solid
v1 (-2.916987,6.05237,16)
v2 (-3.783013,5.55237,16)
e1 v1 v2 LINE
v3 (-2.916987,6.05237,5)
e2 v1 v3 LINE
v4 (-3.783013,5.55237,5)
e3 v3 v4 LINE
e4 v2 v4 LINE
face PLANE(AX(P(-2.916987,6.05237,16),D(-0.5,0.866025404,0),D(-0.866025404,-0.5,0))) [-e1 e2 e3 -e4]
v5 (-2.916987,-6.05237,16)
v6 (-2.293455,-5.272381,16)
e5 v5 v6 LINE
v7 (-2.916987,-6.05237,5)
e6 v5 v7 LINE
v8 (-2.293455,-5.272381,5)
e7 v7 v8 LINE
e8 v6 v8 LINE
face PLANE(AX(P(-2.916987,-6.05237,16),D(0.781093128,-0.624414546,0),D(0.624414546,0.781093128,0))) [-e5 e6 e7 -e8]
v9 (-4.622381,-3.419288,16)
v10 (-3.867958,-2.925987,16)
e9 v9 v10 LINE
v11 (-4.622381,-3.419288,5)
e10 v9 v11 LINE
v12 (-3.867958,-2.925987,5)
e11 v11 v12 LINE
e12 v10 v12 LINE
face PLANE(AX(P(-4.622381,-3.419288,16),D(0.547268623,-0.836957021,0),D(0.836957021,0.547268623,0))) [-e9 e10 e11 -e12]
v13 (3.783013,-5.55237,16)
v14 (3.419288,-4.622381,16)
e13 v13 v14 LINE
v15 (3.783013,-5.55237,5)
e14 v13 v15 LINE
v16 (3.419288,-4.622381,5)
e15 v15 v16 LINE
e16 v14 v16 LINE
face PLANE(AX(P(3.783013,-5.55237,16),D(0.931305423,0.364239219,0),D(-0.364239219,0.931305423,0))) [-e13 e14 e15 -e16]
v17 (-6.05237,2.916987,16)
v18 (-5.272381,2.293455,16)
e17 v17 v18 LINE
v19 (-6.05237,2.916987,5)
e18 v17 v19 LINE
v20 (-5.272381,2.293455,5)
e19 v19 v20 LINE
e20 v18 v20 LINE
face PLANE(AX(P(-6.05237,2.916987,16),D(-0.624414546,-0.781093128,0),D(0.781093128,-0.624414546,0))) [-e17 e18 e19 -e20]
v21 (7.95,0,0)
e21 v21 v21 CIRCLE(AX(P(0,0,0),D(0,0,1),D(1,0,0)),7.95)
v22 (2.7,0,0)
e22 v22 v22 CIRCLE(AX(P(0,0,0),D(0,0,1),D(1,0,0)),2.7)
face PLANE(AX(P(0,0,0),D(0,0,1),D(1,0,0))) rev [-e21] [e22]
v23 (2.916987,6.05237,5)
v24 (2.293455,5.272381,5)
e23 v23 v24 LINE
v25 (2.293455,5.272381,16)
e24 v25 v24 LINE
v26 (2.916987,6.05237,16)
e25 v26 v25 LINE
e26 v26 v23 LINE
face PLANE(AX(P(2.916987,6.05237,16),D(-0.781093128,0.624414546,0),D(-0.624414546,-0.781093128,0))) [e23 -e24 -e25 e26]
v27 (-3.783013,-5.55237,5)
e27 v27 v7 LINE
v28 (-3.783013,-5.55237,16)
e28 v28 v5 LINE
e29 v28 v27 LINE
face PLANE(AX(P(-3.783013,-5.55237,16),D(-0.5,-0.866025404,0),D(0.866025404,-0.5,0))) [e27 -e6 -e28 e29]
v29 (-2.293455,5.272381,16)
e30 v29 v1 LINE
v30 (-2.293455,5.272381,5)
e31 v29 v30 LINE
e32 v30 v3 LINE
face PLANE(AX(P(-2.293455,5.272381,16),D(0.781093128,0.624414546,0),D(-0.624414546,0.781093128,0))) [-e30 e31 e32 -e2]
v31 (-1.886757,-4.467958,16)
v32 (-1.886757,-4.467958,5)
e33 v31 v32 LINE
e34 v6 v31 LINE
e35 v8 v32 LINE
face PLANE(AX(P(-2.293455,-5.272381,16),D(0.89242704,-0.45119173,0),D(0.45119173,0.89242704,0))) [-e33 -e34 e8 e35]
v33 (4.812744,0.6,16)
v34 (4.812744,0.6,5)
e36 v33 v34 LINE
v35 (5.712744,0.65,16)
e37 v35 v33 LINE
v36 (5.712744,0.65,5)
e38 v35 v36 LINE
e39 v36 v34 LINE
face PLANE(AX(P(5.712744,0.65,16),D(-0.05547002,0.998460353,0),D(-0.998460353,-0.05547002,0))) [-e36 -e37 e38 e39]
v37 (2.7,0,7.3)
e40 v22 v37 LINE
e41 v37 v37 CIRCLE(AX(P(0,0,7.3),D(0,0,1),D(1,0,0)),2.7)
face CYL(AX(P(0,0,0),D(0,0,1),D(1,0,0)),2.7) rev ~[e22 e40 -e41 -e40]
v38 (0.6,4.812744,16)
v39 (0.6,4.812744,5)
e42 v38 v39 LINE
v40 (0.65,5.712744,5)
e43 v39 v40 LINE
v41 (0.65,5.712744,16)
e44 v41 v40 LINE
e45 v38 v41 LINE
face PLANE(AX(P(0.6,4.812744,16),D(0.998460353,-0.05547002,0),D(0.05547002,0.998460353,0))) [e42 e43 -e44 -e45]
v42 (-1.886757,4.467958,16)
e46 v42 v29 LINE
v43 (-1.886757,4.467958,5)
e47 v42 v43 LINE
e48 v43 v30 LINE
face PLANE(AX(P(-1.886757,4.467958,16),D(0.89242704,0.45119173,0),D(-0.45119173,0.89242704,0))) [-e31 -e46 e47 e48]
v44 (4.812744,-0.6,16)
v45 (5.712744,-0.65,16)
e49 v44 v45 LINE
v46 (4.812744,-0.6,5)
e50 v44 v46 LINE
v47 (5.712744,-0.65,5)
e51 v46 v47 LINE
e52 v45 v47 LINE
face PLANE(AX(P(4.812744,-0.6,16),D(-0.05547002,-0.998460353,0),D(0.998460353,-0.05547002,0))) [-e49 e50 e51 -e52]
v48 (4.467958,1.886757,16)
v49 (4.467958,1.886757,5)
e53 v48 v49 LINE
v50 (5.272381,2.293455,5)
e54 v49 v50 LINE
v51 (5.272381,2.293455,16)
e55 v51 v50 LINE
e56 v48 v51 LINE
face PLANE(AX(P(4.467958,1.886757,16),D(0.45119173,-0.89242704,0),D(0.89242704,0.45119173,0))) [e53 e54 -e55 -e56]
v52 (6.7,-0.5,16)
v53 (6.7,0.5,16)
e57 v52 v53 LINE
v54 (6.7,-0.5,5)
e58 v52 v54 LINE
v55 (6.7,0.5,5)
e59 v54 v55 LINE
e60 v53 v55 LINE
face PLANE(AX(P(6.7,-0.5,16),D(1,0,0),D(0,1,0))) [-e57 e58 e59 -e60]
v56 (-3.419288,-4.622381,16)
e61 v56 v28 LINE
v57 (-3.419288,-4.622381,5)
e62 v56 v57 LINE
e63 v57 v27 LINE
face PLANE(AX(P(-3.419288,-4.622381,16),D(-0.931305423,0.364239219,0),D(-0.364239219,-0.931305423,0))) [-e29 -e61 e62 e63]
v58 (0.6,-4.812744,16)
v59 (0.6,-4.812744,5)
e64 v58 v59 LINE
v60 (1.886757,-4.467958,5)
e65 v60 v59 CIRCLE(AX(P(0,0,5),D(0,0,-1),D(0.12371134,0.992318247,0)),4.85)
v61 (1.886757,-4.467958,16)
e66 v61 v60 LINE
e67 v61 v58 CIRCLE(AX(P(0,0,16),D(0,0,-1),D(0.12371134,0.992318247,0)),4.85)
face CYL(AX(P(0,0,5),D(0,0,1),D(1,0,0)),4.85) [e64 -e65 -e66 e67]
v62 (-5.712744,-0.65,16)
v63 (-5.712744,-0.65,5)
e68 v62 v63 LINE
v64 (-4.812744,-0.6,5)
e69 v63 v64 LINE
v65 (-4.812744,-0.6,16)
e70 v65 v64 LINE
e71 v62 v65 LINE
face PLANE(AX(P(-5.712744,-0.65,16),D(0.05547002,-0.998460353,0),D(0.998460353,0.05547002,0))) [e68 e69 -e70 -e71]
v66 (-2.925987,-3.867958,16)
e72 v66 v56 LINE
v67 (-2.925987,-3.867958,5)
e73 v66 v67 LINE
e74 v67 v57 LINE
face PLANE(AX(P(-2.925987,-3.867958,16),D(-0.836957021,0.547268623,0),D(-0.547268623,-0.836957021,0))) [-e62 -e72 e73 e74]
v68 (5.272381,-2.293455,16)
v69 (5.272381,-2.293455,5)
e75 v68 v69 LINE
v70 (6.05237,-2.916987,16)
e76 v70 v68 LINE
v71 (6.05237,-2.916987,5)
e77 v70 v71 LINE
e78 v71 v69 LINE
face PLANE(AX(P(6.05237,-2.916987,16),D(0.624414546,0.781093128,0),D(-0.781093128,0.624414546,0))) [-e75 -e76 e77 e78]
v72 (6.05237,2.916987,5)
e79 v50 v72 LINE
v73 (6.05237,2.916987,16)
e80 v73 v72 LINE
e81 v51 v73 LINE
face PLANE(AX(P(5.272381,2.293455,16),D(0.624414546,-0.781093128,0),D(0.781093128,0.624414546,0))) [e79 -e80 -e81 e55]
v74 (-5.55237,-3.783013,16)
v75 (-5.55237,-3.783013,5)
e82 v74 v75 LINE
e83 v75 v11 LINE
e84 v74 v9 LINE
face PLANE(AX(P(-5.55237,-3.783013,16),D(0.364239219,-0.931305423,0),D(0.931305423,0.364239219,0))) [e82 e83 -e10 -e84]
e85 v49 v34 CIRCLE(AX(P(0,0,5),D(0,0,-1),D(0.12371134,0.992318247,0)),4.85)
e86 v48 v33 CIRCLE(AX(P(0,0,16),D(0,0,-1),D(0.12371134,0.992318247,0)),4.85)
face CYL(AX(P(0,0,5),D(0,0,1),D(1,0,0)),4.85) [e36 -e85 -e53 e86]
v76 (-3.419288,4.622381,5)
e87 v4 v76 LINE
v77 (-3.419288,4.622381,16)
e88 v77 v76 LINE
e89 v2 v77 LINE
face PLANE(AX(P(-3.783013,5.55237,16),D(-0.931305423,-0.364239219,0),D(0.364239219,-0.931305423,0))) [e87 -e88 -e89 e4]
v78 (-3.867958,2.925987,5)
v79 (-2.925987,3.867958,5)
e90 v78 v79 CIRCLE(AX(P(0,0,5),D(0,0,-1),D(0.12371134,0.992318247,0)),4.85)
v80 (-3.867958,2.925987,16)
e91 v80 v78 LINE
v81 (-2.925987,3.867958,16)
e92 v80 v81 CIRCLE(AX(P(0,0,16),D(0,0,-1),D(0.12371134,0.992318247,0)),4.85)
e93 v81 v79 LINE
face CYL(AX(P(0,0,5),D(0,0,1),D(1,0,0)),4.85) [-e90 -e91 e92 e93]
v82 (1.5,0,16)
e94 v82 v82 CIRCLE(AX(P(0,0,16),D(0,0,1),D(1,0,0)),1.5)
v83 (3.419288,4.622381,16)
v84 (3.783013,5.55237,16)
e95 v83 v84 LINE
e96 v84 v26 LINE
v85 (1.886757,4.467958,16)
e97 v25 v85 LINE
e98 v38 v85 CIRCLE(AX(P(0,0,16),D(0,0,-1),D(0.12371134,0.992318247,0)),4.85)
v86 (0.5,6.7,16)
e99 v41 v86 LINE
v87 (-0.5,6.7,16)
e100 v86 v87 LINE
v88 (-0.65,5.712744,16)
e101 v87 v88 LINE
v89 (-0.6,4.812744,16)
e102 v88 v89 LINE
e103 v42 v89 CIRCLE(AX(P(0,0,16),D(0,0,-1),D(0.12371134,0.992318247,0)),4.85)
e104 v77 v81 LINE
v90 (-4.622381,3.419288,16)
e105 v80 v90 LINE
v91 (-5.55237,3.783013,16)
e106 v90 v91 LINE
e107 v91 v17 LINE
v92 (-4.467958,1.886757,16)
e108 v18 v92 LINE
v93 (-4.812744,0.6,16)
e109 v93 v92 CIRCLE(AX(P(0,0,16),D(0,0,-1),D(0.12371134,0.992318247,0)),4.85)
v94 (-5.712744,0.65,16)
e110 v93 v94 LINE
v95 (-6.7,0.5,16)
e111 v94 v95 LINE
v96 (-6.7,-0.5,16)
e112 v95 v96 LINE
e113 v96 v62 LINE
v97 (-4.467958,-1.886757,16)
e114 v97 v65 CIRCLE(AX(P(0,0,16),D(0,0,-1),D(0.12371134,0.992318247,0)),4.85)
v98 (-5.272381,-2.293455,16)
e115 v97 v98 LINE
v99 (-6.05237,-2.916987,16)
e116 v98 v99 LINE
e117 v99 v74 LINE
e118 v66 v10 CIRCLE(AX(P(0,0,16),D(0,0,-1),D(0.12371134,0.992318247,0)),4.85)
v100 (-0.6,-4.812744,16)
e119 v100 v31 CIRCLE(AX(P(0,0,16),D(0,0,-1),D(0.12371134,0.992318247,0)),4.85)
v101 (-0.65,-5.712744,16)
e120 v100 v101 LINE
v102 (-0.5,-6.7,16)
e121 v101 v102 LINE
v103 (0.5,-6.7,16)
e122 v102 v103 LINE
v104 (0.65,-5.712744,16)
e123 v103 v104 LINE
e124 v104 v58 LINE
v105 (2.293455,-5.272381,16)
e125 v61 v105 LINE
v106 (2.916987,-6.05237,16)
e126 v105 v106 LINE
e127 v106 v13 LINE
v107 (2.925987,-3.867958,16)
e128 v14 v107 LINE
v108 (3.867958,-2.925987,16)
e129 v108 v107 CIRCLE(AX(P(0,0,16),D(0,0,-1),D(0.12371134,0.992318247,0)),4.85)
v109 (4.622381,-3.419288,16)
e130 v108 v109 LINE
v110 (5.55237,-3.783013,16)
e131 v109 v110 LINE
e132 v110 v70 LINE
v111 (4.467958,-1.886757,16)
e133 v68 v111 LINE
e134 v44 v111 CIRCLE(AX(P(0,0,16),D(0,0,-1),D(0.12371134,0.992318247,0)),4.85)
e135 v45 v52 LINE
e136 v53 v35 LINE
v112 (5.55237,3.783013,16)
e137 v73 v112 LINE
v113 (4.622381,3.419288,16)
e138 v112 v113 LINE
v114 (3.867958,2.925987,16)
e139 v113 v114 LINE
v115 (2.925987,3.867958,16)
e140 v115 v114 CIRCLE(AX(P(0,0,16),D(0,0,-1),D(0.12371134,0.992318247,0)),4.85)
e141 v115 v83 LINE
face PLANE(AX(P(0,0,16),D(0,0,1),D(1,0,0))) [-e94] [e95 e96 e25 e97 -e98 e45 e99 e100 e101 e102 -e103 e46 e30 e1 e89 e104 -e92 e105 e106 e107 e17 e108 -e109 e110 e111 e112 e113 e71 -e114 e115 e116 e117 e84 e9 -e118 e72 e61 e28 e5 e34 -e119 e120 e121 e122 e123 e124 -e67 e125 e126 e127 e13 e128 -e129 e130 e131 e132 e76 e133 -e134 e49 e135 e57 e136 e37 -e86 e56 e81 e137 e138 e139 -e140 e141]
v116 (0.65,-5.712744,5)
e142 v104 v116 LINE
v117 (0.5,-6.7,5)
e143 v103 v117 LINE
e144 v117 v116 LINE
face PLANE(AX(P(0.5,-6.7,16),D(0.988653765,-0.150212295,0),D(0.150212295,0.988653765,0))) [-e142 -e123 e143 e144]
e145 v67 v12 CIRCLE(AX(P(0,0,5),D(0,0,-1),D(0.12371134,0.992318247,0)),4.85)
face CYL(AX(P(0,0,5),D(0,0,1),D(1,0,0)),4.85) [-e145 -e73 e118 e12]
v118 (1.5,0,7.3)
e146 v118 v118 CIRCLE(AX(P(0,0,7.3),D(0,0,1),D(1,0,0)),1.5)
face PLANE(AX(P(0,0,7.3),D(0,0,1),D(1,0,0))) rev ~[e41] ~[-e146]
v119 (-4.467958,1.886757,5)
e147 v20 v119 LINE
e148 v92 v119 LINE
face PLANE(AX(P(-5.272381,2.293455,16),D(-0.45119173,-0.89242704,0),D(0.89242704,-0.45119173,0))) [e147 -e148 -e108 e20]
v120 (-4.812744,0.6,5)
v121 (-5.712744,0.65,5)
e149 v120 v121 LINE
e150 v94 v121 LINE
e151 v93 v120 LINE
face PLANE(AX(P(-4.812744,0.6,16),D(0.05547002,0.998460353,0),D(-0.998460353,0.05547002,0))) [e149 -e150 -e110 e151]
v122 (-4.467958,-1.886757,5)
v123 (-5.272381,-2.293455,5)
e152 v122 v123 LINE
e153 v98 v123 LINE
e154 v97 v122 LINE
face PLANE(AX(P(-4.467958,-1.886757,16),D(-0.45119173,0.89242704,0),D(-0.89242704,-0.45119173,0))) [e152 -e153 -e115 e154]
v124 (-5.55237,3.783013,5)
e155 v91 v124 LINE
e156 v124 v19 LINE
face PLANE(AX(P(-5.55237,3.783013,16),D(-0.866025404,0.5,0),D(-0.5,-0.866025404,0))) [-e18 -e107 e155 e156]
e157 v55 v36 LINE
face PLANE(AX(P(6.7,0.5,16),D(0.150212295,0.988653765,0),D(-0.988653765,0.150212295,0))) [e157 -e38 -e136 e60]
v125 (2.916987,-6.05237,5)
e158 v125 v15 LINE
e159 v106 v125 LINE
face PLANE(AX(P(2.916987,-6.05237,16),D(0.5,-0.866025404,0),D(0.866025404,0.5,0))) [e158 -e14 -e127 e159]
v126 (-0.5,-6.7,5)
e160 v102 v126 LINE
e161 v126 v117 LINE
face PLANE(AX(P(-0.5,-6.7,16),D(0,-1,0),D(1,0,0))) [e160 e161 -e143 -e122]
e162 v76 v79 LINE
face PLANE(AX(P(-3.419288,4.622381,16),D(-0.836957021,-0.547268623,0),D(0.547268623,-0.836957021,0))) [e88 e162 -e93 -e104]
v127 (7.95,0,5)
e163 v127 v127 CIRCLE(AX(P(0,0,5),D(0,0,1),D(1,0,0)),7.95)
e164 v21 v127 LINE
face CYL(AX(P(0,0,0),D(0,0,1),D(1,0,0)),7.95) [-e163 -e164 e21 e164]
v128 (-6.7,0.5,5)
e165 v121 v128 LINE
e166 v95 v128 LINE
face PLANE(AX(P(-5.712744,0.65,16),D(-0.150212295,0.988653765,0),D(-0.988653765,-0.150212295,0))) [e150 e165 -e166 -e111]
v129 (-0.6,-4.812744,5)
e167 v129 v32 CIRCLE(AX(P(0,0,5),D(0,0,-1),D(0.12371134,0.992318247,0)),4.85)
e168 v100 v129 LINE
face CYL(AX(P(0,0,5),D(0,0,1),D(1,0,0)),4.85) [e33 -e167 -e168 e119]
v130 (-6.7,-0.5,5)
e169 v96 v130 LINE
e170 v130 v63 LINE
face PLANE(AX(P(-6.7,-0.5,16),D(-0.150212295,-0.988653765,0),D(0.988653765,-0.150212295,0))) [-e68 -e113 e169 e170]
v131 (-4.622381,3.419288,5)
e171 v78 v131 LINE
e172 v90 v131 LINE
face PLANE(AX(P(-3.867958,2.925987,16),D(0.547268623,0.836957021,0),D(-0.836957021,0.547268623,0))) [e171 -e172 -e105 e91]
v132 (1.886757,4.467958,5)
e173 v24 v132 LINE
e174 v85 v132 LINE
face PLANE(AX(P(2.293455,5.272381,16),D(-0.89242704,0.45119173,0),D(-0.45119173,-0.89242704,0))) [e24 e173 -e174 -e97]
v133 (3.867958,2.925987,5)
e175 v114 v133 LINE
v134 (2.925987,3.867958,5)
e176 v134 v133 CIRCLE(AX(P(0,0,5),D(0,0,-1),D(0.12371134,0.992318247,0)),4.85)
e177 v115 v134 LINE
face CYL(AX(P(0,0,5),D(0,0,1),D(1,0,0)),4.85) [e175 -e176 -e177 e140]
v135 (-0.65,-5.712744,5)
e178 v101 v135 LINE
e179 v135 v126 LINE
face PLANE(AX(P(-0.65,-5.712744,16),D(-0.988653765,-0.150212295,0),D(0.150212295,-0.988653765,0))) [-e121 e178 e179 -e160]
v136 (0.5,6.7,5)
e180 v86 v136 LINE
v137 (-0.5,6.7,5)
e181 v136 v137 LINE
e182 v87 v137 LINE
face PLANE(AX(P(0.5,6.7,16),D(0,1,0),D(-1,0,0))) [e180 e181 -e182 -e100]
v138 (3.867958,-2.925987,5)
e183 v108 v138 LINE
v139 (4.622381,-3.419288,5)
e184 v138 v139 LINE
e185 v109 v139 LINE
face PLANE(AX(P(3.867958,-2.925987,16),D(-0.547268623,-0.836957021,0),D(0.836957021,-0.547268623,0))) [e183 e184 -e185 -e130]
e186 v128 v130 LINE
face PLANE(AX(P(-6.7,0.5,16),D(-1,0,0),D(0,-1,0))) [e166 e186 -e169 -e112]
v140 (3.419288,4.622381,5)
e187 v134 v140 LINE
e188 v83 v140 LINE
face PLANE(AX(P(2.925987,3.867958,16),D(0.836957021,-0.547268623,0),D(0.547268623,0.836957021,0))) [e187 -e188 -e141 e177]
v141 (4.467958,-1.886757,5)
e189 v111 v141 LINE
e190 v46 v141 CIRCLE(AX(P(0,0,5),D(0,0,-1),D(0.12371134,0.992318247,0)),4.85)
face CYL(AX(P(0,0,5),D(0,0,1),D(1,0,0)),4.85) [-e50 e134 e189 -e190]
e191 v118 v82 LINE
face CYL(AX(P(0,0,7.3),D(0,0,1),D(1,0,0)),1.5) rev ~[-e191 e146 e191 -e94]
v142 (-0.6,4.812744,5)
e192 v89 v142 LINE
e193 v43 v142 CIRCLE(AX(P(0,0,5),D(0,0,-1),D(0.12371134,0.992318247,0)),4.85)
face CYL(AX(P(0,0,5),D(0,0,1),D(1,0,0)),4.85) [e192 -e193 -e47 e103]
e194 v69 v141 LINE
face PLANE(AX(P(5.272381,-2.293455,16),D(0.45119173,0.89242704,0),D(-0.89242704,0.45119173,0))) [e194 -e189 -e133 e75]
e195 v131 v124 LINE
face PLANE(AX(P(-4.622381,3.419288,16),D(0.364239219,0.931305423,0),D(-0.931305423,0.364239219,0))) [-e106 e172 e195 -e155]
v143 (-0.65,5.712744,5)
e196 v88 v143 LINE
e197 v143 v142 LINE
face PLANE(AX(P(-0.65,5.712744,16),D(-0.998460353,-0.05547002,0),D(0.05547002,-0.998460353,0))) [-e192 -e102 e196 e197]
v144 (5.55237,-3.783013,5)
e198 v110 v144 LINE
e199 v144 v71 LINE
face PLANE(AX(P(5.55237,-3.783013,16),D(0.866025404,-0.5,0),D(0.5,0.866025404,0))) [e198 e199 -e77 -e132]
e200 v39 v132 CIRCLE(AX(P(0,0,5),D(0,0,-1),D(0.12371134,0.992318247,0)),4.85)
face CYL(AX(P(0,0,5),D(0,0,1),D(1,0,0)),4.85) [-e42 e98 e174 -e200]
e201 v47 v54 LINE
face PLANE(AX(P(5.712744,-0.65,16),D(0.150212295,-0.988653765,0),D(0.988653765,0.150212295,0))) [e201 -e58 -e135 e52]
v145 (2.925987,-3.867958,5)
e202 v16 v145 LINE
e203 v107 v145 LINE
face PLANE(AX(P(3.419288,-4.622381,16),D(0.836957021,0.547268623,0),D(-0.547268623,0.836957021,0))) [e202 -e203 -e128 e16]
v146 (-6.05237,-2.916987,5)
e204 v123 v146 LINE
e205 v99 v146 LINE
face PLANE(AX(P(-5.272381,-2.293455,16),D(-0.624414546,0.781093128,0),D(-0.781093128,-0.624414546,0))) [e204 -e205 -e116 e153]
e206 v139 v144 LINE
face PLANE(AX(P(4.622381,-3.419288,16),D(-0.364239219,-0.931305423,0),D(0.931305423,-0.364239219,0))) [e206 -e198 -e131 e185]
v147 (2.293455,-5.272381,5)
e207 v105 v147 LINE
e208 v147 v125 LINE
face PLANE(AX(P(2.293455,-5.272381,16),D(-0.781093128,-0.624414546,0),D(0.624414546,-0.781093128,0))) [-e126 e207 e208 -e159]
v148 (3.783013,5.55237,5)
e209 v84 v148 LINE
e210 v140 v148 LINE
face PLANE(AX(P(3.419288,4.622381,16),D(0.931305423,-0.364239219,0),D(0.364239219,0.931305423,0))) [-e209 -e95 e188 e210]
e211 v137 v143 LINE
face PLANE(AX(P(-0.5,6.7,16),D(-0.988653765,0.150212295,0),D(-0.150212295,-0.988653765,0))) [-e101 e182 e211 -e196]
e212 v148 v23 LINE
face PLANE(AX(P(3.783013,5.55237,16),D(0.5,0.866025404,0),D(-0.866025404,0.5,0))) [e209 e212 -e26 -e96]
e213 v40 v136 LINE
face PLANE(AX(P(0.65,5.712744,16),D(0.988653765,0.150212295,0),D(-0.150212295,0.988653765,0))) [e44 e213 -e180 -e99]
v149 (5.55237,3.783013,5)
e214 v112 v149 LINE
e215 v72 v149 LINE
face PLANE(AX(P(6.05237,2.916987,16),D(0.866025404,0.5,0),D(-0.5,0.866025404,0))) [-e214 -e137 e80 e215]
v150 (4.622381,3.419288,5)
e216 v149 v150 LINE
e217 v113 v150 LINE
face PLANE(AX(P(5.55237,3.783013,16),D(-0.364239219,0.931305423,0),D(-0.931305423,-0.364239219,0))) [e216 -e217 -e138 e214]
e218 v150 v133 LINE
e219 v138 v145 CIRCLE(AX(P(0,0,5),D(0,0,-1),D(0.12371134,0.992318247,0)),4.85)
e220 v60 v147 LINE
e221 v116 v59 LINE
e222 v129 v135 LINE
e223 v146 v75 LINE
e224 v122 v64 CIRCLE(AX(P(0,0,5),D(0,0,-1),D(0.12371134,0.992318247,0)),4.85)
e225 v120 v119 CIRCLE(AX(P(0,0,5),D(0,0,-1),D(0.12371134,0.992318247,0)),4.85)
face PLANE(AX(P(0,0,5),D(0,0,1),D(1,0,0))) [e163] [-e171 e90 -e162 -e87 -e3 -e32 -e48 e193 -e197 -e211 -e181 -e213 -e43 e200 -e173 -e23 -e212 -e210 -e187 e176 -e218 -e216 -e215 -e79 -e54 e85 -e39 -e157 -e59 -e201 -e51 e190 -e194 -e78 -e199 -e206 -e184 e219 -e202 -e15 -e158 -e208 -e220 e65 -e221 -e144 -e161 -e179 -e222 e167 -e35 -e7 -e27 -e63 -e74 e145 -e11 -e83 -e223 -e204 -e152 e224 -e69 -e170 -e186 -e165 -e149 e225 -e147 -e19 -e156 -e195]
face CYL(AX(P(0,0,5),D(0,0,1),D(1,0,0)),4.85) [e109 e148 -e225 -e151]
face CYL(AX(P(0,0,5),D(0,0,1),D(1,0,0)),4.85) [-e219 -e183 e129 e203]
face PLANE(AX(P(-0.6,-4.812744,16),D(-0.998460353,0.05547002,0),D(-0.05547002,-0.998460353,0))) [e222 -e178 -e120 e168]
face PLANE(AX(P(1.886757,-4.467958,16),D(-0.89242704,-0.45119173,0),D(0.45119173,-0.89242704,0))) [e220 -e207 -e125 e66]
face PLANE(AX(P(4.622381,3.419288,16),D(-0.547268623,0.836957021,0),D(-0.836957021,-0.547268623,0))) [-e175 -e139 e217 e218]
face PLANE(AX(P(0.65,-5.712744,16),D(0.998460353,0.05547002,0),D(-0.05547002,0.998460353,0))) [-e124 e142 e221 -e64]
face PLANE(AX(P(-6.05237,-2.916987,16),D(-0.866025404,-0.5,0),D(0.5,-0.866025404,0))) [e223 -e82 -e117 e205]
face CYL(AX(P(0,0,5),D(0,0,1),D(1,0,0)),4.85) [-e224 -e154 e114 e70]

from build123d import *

# Parameters (mm, degrees)
F5_DEPTH        = 11
F5_COPIES_COUNT = 12


# Not quite as in the source:
# - a pattern or mirror of a feature is missing from the dataset's text; its kind, count and spacing are read off the source's solid


with BuildPart() as f1:
    # F0 (on Front) → F1 (revolve)
    with BuildSketch(Plane.XZ):
        Polygon((0, 16), (0, 0), (7.95, 0), (7.95, 5), (4.85, 5), (4.85, 16), align=None)
    revolve(axis=Axis((0, 0, 9.6948958626), (0, 0, 1)))

    # F2 (on Front) → F3 (revolve, cut)
    with BuildSketch(Plane.XZ):
        Polygon((0, 0), (2.7, 0), (2.7, 7.3), (1.5, 7.3), (1.5, 16), (0, 16), align=None)
    revolve(axis=Axis((0, 0, 9.4397878274), (0, 0, 1)), mode=Mode.SUBTRACT)

    # F4 (on face) → F5 (join, through all)
    with BuildSketch(Plane.XY.offset(16)):
        with BuildLine():
            Line((-0.65, 5.7127435003), (-0.6, 4.8127435003))
            ThreePointArc((-0.6, 4.8127435003), (0, 4.85), (0.6, 4.8127435003))
            Line((0.6, 4.8127435003), (0.65, 5.7127435003))
            Line((0.65, 5.7127435003), (0.5, 6.7))
            Line((0.5, 6.7), (-0.5, 6.7))
            Line((-0.5, 6.7), (-0.65, 5.7127435003))
        make_face()
    f5 = extrude(amount=-F5_DEPTH)

    # F5_copies: F5 ×12 about axis
    f5_copies_axis = Axis((0, 0, 0), (0, 0, 1))
    for i in range(1, F5_COPIES_COUNT):
        add(f5.rotate(f5_copies_axis, i * 360 / F5_COPIES_COUNT))


solid = f1.part
